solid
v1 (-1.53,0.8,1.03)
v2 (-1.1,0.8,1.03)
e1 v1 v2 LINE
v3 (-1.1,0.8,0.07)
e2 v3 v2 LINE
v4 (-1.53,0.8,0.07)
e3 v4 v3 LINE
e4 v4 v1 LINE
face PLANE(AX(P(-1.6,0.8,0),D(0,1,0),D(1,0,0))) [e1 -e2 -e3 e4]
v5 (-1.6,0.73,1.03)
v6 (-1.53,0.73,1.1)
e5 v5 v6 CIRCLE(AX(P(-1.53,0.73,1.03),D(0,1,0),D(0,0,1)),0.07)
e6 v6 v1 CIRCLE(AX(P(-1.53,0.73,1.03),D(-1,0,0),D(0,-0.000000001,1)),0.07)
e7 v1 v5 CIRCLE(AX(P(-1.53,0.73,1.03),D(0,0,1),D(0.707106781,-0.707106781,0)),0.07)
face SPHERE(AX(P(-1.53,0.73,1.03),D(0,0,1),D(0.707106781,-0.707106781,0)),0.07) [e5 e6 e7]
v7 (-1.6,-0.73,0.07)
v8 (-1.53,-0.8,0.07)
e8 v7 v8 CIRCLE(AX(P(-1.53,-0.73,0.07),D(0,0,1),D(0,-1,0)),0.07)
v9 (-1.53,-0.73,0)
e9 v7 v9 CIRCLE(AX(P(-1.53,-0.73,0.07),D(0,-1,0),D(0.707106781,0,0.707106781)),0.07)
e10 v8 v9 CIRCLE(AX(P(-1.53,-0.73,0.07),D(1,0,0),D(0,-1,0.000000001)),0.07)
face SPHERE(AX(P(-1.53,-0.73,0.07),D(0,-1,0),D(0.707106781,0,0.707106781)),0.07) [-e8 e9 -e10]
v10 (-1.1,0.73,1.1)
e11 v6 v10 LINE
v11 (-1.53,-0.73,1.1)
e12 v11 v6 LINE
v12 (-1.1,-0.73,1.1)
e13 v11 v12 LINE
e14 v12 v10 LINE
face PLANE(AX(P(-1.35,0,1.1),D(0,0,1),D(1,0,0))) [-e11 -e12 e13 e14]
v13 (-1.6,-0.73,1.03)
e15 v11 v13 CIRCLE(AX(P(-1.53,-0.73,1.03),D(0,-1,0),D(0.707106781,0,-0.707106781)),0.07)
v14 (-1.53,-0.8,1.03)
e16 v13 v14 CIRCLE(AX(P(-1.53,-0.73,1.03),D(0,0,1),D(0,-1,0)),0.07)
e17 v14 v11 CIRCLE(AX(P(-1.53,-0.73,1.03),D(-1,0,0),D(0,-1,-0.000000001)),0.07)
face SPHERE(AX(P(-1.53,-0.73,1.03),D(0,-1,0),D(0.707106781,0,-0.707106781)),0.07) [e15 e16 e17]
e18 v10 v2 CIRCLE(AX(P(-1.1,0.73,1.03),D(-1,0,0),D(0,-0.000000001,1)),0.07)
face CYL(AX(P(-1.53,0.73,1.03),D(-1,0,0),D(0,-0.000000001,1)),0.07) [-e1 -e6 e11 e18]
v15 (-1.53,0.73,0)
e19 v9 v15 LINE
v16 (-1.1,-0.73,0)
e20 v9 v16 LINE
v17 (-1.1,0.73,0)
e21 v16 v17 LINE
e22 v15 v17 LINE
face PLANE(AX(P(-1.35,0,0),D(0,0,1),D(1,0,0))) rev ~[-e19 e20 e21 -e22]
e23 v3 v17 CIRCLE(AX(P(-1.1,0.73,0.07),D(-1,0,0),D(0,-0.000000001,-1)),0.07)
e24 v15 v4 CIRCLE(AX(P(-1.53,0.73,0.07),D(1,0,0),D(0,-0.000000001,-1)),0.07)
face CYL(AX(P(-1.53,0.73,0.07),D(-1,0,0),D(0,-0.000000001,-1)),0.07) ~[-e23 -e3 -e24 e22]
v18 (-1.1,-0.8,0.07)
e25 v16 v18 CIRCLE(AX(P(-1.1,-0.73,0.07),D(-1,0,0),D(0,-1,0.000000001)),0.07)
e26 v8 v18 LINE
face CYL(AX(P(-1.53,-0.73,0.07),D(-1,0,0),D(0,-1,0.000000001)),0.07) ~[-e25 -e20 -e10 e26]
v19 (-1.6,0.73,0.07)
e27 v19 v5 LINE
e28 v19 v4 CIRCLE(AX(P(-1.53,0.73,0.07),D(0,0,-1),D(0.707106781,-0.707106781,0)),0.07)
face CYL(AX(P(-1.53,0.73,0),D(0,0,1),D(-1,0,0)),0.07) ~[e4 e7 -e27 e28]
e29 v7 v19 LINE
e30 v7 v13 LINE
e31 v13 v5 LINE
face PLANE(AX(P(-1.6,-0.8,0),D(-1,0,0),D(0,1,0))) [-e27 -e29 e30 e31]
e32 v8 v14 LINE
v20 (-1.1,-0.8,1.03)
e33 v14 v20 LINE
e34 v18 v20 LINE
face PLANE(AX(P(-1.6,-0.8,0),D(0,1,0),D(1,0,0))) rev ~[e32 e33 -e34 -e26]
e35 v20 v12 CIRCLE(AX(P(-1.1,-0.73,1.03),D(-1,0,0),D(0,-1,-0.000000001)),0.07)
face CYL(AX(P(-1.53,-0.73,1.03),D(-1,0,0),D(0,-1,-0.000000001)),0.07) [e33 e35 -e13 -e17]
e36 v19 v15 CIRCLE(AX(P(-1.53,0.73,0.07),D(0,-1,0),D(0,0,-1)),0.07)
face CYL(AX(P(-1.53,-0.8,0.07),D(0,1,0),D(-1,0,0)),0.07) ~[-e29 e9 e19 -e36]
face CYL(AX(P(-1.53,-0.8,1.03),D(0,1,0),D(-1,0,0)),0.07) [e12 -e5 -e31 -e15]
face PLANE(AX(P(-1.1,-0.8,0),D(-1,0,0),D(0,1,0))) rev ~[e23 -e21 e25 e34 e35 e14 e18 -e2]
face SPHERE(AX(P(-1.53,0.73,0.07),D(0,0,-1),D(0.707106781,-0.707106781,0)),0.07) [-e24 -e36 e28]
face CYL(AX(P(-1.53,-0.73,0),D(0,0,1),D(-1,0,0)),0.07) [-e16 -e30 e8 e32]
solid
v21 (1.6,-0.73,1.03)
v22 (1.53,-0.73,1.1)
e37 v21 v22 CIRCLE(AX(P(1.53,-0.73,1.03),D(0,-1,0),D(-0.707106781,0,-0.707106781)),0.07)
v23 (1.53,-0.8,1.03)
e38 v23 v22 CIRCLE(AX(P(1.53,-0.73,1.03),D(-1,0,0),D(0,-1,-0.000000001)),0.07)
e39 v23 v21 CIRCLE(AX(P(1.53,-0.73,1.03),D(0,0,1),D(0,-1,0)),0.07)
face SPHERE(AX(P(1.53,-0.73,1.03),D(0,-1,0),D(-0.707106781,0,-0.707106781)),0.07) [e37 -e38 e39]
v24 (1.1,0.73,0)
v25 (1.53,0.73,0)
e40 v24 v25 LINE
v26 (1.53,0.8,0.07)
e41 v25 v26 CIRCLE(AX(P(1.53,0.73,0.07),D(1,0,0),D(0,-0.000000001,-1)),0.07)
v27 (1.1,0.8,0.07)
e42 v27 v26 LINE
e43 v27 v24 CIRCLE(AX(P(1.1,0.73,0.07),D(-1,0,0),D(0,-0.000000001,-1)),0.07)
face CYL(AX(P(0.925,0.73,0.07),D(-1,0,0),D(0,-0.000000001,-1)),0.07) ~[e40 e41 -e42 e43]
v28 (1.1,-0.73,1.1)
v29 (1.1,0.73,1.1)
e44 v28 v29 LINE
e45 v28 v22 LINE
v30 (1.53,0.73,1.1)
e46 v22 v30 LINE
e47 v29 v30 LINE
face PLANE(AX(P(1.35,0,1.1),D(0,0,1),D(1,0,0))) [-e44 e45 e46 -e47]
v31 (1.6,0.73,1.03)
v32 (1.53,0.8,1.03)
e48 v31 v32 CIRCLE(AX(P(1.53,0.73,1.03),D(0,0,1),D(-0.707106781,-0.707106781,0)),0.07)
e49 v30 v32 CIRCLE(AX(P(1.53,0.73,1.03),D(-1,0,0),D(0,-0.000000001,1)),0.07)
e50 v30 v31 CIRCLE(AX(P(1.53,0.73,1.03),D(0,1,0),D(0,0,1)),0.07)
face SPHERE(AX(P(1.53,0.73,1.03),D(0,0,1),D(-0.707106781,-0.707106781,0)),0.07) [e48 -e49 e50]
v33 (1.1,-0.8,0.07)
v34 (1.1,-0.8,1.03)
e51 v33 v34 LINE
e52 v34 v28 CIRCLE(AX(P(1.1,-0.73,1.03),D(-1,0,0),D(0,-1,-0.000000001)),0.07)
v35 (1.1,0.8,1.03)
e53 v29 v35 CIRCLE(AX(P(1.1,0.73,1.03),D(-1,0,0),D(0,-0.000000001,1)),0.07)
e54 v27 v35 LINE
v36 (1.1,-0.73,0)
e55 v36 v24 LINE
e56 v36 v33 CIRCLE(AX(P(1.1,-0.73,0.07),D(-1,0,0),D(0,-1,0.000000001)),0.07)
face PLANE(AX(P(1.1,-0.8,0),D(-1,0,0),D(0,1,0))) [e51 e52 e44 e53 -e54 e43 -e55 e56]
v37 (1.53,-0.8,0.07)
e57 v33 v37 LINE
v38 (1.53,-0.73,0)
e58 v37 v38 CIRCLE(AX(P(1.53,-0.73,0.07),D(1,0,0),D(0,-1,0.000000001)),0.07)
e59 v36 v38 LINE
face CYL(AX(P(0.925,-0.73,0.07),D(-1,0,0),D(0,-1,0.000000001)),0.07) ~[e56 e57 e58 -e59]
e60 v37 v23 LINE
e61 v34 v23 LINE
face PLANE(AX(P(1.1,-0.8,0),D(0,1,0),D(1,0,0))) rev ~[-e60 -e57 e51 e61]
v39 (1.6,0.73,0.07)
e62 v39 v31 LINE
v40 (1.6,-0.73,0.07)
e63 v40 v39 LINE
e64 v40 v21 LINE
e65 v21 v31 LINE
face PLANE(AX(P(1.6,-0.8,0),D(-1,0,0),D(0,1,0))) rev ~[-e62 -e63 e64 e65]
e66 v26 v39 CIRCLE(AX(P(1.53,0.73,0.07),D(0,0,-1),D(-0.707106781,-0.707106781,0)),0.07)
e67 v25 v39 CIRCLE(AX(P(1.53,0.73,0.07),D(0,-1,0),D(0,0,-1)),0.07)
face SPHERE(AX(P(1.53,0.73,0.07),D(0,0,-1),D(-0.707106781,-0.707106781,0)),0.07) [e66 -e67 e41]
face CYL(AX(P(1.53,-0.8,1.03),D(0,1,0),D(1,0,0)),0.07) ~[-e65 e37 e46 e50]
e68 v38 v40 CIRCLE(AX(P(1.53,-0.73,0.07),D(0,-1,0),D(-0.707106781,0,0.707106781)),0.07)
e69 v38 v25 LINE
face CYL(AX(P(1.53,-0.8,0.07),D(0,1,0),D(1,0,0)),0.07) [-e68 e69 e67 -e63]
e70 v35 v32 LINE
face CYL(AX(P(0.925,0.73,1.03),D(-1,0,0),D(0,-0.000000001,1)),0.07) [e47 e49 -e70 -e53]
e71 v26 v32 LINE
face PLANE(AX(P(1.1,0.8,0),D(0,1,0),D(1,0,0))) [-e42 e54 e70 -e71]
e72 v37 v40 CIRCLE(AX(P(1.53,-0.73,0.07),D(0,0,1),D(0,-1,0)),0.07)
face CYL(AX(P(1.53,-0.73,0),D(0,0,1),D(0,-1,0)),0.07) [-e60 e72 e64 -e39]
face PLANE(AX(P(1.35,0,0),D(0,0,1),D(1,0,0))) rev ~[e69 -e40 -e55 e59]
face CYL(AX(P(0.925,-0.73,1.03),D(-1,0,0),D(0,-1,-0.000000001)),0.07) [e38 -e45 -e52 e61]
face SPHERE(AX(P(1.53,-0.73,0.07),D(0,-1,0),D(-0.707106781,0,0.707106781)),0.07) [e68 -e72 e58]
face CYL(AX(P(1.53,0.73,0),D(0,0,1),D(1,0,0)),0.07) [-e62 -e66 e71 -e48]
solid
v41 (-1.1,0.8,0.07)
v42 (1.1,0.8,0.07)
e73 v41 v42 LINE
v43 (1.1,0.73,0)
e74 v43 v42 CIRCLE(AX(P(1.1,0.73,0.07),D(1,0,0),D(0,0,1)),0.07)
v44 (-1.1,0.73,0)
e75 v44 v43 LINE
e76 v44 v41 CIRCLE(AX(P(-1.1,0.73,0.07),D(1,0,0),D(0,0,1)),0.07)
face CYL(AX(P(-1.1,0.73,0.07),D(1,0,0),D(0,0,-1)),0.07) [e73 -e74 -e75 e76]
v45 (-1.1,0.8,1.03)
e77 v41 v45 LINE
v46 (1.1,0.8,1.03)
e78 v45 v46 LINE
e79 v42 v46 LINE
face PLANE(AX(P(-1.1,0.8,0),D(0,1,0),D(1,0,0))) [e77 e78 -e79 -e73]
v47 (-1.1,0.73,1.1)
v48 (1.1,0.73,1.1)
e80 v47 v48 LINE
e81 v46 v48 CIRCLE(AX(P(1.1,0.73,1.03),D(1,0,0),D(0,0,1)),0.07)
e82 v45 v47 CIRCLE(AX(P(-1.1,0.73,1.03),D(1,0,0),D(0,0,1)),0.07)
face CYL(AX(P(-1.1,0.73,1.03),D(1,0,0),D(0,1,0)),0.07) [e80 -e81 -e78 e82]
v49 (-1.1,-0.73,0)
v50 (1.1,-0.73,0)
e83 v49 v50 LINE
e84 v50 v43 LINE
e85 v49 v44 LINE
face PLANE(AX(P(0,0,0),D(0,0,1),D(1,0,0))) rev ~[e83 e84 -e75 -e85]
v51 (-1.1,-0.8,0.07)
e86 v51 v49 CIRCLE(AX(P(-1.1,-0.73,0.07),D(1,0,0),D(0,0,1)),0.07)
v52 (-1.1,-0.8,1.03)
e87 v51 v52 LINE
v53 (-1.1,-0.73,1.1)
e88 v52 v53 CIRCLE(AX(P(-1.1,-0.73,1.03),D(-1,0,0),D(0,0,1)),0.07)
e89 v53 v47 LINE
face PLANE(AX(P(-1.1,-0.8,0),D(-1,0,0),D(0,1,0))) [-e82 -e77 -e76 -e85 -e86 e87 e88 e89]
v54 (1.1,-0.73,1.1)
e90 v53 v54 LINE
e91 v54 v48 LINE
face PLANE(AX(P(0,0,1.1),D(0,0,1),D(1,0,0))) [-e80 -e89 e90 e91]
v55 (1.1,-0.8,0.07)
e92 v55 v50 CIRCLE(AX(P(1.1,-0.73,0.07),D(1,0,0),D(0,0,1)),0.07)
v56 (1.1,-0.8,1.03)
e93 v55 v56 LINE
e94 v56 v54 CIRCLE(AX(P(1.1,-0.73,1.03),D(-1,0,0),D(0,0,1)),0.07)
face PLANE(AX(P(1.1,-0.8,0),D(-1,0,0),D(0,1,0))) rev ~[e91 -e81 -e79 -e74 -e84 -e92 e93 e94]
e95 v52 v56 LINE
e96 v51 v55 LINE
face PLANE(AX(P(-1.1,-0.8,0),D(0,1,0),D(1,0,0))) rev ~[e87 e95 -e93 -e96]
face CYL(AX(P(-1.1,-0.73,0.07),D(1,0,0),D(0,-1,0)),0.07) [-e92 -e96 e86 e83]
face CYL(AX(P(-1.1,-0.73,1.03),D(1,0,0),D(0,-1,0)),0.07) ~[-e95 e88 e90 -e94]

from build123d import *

# Parameters (mm, degrees)
F0_W           = 0.5
F0_H           = 1.6
F1_DEPTH       = 1.1
F0_W_2         = 2.2
F2_DEPTH       = 1.1
F3_R           = 0.07
F3_2_R         = 0.07
F4_T1_DEPTH    = 0.605
F4_S5_W        = 0.07
F4_S5_H        = 0.07
F4_T6_DEPTH    = 0.07
F4_S11_W       = 0.07
F4_S11_H       = 0.07
F4_T12_DEPTH   = 0.07
F4_S17_W       = 0.07
F4_S17_H       = 0.07
F4_T18_DEPTH   = 0.07
F4_S23_W       = 0.07
F4_S23_H       = 0.07
F4_T24_DEPTH   = 0.07
F4_2_F1_R      = 0.07
F4_2_F2_R      = 0.07
F4_2_F3_R      = 0.07
F4_2_F4_R      = 0.07
F4_3_T1_DEPTH  = 0.605
F4_3_S5_W      = 0.07
F4_3_S5_H      = 0.07
F4_3_T6_DEPTH  = 0.07
F4_3_S11_W     = 0.07
F4_3_S11_H     = 0.07
F4_3_T12_DEPTH = 0.07
F4_3_S17_W     = 0.07
F4_3_S17_H     = 0.07
F4_3_T18_DEPTH = 0.07
F4_3_S23_W     = 0.07
F4_3_S23_H     = 0.07
F4_3_T24_DEPTH = 0.07


# Not quite as in the source:
# - a fillet or chamfer that OpenCascade refuses, or shapes differently, is made with other operations: its cross-section is extruded or revolved along the edge and cut away or added


with BuildPart() as f1:
    # F0 (on Top) → F1 (new body)
    with BuildSketch(Plane.XY):
        with Locations((-1.35, 0)):
            Rectangle(F0_W, F0_H)
    extrude(amount=F1_DEPTH)

    # F3#2
    f3_2_edges = [f1.edges().sort_by_distance(p)[0] for p in [
        (-1.6, 0.8, 0.55),
        (-1.6, -0.8, 0.55),
        (-1.6, 0, 0),
        (-1.6, 0, 1.1),
    ]]
    fillet(f3_2_edges, radius=F3_2_R)

    # F4#3: fillet of radius 0.07 on 4 edges, made by hand

    # F4_3_s2 → F4_3_t1 (cut)
    with BuildSketch(Plane.YZ.offset(-1.53)):
        with BuildLine():
            ThreePointArc((0.73, 1.1), (0.7794974747, 1.0794974747), (0.8, 1.03))
            Line((0.8, 1.03), (0.8, 1.1))
            Line((0.8, 1.1), (0.73, 1.1))
        make_face()
        with BuildLine():
            ThreePointArc((0.73, 0), (0.7794974747, 0.0205025253), (0.8, 0.07))
            Line((0.8, 0.07), (0.8, 0))
            Line((0.8, 0), (0.73, 0))
        make_face()
        with BuildLine():
            ThreePointArc((-0.8, 1.03), (-0.7794974747, 1.0794974747), (-0.73, 1.1))
            Line((-0.73, 1.1), (-0.8, 1.1))
            Line((-0.8, 1.1), (-0.8, 1.03))
        make_face()
        with BuildLine():
            ThreePointArc((-0.8, 0.07), (-0.7794974747, 0.0205025253), (-0.73, 0))
            Line((-0.73, 0), (-0.8, 0))
            Line((-0.8, 0), (-0.8, 0.07))
        make_face()
    extrude(amount=F4_3_T1_DEPTH, mode=Mode.SUBTRACT)


with BuildPart() as f1b:
    # F0 (on Top) → F1, piece 2 (new body)
    with BuildSketch(Plane.XY):
        with Locations((1.35, 0)):
            Rectangle(F0_W, F0_H)
    extrude(amount=F1_DEPTH)

    # F3
    f3_edges = [f1b.edges().sort_by_distance(p)[0] for p in [
        (1.6, -0.8, 0.55),
        (1.6, 0.8, 0.55),
        (1.6, 0, 0),
        (1.6, 0, 1.1),
    ]]
    fillet(f3_edges, radius=F3_R)

    # F4: fillet of radius 0.07 on 4 edges, made by hand

    # F4_s2 → F4_t1 (cut)
    with BuildSketch(Plane.YZ.offset(0.925)):
        with BuildLine():
            ThreePointArc((0.73, 1.1), (0.7794974747, 1.0794974747), (0.8, 1.03))
            Line((0.8, 1.03), (0.8, 1.1))
            Line((0.8, 1.1), (0.73, 1.1))
        make_face()
        with BuildLine():
            ThreePointArc((0.73, 0), (0.7794974747, 0.0205025253), (0.8, 0.07))
            Line((0.8, 0.07), (0.8, 0))
            Line((0.8, 0), (0.73, 0))
        make_face()
        with BuildLine():
            ThreePointArc((-0.8, 1.03), (-0.7794974747, 1.0794974747), (-0.73, 1.1))
            Line((-0.73, 1.1), (-0.8, 1.1))
            Line((-0.8, 1.1), (-0.8, 1.03))
        make_face()
        with BuildLine():
            ThreePointArc((-0.8, 0.07), (-0.7794974747, 0.0205025253), (-0.73, 0))
            Line((-0.73, 0), (-0.8, 0))
            Line((-0.8, 0), (-0.8, 0.07))
        make_face()
    extrude(amount=F4_T1_DEPTH, mode=Mode.SUBTRACT)


with BuildPart() as f2:
    # F0 (on Top) → F2 (new body)
    with BuildSketch(Plane.XY):
        Rectangle(F0_W_2, F0_H)
    extrude(amount=F2_DEPTH)

    # F4#2: fillet of radius 0.07 on 4 edges, made by hand

    # F4_2_f1
    f4_2_f1_edges = [f2.edges().sort_by_distance(p)[0] for p in [
        (0, -0.8, 0),
    ]]
    fillet(f4_2_f1_edges, radius=F4_2_F1_R)

    # F4_2_f2
    f4_2_f2_edges = [f2.edges().sort_by_distance(p)[0] for p in [
        (0, -0.8, 1.1),
    ]]
    fillet(f4_2_f2_edges, radius=F4_2_F2_R)

    # F4_2_f3
    f4_2_f3_edges = [f2.edges().sort_by_distance(p)[0] for p in [
        (0, 0.8, 0),
    ]]
    fillet(f4_2_f3_edges, radius=F4_2_F3_R)

    # F4_2_f4
    f4_2_f4_edges = [f2.edges().sort_by_distance(p)[0] for p in [
        (0, 0.8, 1.1),
    ]]
    fillet(f4_2_f4_edges, radius=F4_2_F4_R)


with BuildPart() as f4_tool4:
    # F4_s5 → F4_t6 (new body)
    with BuildSketch(Plane.XZ.offset(0.73)):
        with Locations((1.565, 0.035)):
            Rectangle(F4_S5_W, F4_S5_H)
    extrude(amount=F4_T6_DEPTH)

    # F4_s7 → F4_t8 (revolve, cut)
    with BuildSketch(Plane(origin=(1.53, -0.73, 0.07), x_dir=(-0.7071067812, 0, 0.7071067812), z_dir=(0.7071067812, 0, 0.7071067812))):
        with BuildLine():
            ThreePointArc((0, -0.07), (0.07, 0), (0, 0.07))
            Line((0, 0.07), (0, -0.07))
        make_face()
    revolve(axis=Axis((1.53, -0.73, 0.07), (0, -1, 0)), mode=Mode.SUBTRACT)


with BuildPart() as f1b_1:
    add(f1b.part)

    # F4_t3: cut F4_tool4
    add(f4_tool4.part, mode=Mode.SUBTRACT)


with BuildPart() as f4_tool10:
    # F4_s11 → F4_t12 (new body)
    with BuildSketch(Plane.XZ.offset(0.73)):
        with Locations((1.565, 1.065)):
            Rectangle(F4_S11_W, F4_S11_H)
    extrude(amount=F4_T12_DEPTH)

    # F4_s13 → F4_t14 (revolve, cut)
    with BuildSketch(Plane(origin=(1.53, -0.73, 1.03), x_dir=(-0.7071067812, 0, -0.7071067812), z_dir=(-0.7071067812, 0, 0.7071067812))):
        with BuildLine():
            ThreePointArc((0, -0.07), (0.07, 0), (0, 0.07))
            Line((0, 0.07), (0, -0.07))
        make_face()
    revolve(axis=Axis((1.53, -0.73, 1.03), (0, -1, 0)), mode=Mode.SUBTRACT)


with BuildPart() as f1b_2:
    add(f1b_1.part)

    # F4_t9: cut F4_tool10
    add(f4_tool10.part, mode=Mode.SUBTRACT)


with BuildPart() as f4_tool16:
    # F4_s17 → F4_t18 (new body)
    with BuildSketch(Plane.XY.offset(0.07)):
        with Locations((1.565, 0.765)):
            Rectangle(F4_S17_W, F4_S17_H)
    extrude(amount=-F4_T18_DEPTH)

    # F4_s19 → F4_t20 (revolve, cut)
    with BuildSketch(Plane(origin=(1.53, 0.73, 0.07), x_dir=(-0.7071067812, -0.7071067812, 0), z_dir=(0.7071067812, -0.7071067812, 0))):
        with BuildLine():
            ThreePointArc((0, -0.07), (0.07, 0), (0, 0.07))
            Line((0, 0.07), (0, -0.07))
        make_face()
    revolve(axis=Axis((1.53, 0.73, 0.07), (0, 0, -1)), mode=Mode.SUBTRACT)


with BuildPart() as f1b_3:
    add(f1b_2.part)

    # F4_t15: cut F4_tool16
    add(f4_tool16.part, mode=Mode.SUBTRACT)


with BuildPart() as f4_tool22:
    # F4_s23 → F4_t24 (new body)
    with BuildSketch(Plane.XY.offset(1.03)):
        with Locations((1.565, 0.765)):
            Rectangle(F4_S23_W, F4_S23_H)
    extrude(amount=F4_T24_DEPTH)

    # F4_s25 → F4_t26 (revolve, cut)
    with BuildSketch(Plane(origin=(1.53, 0.73, 1.03), x_dir=(-0.7071067812, -0.7071067812, 0), z_dir=(-0.7071067812, 0.7071067812, 0))):
        with BuildLine():
            ThreePointArc((0, -0.07), (0.07, 0), (0, 0.07))
            Line((0, 0.07), (0, -0.07))
        make_face()
    revolve(axis=Axis((1.53, 0.73, 1.03), (0, 0, 1)), mode=Mode.SUBTRACT)


with BuildPart() as f1b_4:
    add(f1b_3.part)

    # F4_t21: cut F4_tool22
    add(f4_tool22.part, mode=Mode.SUBTRACT)


with BuildPart() as f4_3_tool4:
    # F4_3_s5 → F4_3_t6 (new body)
    with BuildSketch(Plane.XZ.offset(0.73)):
        with Locations((-1.565, 0.035)):
            Rectangle(F4_3_S5_W, F4_3_S5_H)
    extrude(amount=F4_3_T6_DEPTH)

    # F4_3_s7 → F4_3_t8 (revolve, cut)
    with BuildSketch(Plane(origin=(-1.53, -0.73, 0.07), x_dir=(0.7071067812, 0, 0.7071067812), z_dir=(0.7071067812, 0, -0.7071067812))):
        with BuildLine():
            ThreePointArc((0, -0.07), (0.07, 0), (0, 0.07))
            Line((0, 0.07), (0, -0.07))
        make_face()
    revolve(axis=Axis((-1.53, -0.73, 0.07), (0, -1, 0)), mode=Mode.SUBTRACT)


with BuildPart() as f1_1:
    add(f1.part)

    # F4_3_t3: cut F4_3_tool4
    add(f4_3_tool4.part, mode=Mode.SUBTRACT)


with BuildPart() as f4_3_tool10:
    # F4_3_s11 → F4_3_t12 (new body)
    with BuildSketch(Plane.XZ.offset(0.73)):
        with Locations((-1.565, 1.065)):
            Rectangle(F4_3_S11_W, F4_3_S11_H)
    extrude(amount=F4_3_T12_DEPTH)

    # F4_3_s13 → F4_3_t14 (revolve, cut)
    with BuildSketch(Plane(origin=(-1.53, -0.73, 1.03), x_dir=(0.7071067812, 0, -0.7071067812), z_dir=(-0.7071067812, 0, -0.7071067812))):
        with BuildLine():
            ThreePointArc((0, -0.07), (0.07, 0), (0, 0.07))
            Line((0, 0.07), (0, -0.07))
        make_face()
    revolve(axis=Axis((-1.53, -0.73, 1.03), (0, -1, 0)), mode=Mode.SUBTRACT)


with BuildPart() as f1_2:
    add(f1_1.part)

    # F4_3_t9: cut F4_3_tool10
    add(f4_3_tool10.part, mode=Mode.SUBTRACT)


with BuildPart() as f4_3_tool16:
    # F4_3_s17 → F4_3_t18 (new body)
    with BuildSketch(Plane.XY.offset(0.07)):
        with Locations((-1.565, 0.765)):
            Rectangle(F4_3_S17_W, F4_3_S17_H)
    extrude(amount=-F4_3_T18_DEPTH)

    # F4_3_s19 → F4_3_t20 (revolve, cut)
    with BuildSketch(Plane(origin=(-1.53, 0.73, 0.07), x_dir=(0.7071067812, -0.7071067812, 0), z_dir=(0.7071067812, 0.7071067812, 0))):
        with BuildLine():
            ThreePointArc((0, -0.07), (0.07, 0), (0, 0.07))
            Line((0, 0.07), (0, -0.07))
        make_face()
    revolve(axis=Axis((-1.53, 0.73, 0.07), (0, 0, -1)), mode=Mode.SUBTRACT)


with BuildPart() as f1_3:
    add(f1_2.part)

    # F4_3_t15: cut F4_3_tool16
    add(f4_3_tool16.part, mode=Mode.SUBTRACT)


with BuildPart() as f4_3_tool22:
    # F4_3_s23 → F4_3_t24 (new body)
    with BuildSketch(Plane.XY.offset(1.03)):
        with Locations((-1.565, 0.765)):
            Rectangle(F4_3_S23_W, F4_3_S23_H)
    extrude(amount=F4_3_T24_DEPTH)

    # F4_3_s25 → F4_3_t26 (revolve, cut)
    with BuildSketch(Plane(origin=(-1.53, 0.73, 1.03), x_dir=(0.7071067812, -0.7071067812, 0), z_dir=(-0.7071067812, -0.7071067812, 0))):
        with BuildLine():
            ThreePointArc((0, -0.07), (0.07, 0), (0, 0.07))
            Line((0, 0.07), (0, -0.07))
        make_face()
    revolve(axis=Axis((-1.53, 0.73, 1.03), (0, 0, 1)), mode=Mode.SUBTRACT)


with BuildPart() as f1_4:
    add(f1_3.part)

    # F4_3_t21: cut F4_3_tool22
    add(f4_3_tool22.part, mode=Mode.SUBTRACT)


solid = Compound([f2.part, f1b_4.part, f1_4.part])
